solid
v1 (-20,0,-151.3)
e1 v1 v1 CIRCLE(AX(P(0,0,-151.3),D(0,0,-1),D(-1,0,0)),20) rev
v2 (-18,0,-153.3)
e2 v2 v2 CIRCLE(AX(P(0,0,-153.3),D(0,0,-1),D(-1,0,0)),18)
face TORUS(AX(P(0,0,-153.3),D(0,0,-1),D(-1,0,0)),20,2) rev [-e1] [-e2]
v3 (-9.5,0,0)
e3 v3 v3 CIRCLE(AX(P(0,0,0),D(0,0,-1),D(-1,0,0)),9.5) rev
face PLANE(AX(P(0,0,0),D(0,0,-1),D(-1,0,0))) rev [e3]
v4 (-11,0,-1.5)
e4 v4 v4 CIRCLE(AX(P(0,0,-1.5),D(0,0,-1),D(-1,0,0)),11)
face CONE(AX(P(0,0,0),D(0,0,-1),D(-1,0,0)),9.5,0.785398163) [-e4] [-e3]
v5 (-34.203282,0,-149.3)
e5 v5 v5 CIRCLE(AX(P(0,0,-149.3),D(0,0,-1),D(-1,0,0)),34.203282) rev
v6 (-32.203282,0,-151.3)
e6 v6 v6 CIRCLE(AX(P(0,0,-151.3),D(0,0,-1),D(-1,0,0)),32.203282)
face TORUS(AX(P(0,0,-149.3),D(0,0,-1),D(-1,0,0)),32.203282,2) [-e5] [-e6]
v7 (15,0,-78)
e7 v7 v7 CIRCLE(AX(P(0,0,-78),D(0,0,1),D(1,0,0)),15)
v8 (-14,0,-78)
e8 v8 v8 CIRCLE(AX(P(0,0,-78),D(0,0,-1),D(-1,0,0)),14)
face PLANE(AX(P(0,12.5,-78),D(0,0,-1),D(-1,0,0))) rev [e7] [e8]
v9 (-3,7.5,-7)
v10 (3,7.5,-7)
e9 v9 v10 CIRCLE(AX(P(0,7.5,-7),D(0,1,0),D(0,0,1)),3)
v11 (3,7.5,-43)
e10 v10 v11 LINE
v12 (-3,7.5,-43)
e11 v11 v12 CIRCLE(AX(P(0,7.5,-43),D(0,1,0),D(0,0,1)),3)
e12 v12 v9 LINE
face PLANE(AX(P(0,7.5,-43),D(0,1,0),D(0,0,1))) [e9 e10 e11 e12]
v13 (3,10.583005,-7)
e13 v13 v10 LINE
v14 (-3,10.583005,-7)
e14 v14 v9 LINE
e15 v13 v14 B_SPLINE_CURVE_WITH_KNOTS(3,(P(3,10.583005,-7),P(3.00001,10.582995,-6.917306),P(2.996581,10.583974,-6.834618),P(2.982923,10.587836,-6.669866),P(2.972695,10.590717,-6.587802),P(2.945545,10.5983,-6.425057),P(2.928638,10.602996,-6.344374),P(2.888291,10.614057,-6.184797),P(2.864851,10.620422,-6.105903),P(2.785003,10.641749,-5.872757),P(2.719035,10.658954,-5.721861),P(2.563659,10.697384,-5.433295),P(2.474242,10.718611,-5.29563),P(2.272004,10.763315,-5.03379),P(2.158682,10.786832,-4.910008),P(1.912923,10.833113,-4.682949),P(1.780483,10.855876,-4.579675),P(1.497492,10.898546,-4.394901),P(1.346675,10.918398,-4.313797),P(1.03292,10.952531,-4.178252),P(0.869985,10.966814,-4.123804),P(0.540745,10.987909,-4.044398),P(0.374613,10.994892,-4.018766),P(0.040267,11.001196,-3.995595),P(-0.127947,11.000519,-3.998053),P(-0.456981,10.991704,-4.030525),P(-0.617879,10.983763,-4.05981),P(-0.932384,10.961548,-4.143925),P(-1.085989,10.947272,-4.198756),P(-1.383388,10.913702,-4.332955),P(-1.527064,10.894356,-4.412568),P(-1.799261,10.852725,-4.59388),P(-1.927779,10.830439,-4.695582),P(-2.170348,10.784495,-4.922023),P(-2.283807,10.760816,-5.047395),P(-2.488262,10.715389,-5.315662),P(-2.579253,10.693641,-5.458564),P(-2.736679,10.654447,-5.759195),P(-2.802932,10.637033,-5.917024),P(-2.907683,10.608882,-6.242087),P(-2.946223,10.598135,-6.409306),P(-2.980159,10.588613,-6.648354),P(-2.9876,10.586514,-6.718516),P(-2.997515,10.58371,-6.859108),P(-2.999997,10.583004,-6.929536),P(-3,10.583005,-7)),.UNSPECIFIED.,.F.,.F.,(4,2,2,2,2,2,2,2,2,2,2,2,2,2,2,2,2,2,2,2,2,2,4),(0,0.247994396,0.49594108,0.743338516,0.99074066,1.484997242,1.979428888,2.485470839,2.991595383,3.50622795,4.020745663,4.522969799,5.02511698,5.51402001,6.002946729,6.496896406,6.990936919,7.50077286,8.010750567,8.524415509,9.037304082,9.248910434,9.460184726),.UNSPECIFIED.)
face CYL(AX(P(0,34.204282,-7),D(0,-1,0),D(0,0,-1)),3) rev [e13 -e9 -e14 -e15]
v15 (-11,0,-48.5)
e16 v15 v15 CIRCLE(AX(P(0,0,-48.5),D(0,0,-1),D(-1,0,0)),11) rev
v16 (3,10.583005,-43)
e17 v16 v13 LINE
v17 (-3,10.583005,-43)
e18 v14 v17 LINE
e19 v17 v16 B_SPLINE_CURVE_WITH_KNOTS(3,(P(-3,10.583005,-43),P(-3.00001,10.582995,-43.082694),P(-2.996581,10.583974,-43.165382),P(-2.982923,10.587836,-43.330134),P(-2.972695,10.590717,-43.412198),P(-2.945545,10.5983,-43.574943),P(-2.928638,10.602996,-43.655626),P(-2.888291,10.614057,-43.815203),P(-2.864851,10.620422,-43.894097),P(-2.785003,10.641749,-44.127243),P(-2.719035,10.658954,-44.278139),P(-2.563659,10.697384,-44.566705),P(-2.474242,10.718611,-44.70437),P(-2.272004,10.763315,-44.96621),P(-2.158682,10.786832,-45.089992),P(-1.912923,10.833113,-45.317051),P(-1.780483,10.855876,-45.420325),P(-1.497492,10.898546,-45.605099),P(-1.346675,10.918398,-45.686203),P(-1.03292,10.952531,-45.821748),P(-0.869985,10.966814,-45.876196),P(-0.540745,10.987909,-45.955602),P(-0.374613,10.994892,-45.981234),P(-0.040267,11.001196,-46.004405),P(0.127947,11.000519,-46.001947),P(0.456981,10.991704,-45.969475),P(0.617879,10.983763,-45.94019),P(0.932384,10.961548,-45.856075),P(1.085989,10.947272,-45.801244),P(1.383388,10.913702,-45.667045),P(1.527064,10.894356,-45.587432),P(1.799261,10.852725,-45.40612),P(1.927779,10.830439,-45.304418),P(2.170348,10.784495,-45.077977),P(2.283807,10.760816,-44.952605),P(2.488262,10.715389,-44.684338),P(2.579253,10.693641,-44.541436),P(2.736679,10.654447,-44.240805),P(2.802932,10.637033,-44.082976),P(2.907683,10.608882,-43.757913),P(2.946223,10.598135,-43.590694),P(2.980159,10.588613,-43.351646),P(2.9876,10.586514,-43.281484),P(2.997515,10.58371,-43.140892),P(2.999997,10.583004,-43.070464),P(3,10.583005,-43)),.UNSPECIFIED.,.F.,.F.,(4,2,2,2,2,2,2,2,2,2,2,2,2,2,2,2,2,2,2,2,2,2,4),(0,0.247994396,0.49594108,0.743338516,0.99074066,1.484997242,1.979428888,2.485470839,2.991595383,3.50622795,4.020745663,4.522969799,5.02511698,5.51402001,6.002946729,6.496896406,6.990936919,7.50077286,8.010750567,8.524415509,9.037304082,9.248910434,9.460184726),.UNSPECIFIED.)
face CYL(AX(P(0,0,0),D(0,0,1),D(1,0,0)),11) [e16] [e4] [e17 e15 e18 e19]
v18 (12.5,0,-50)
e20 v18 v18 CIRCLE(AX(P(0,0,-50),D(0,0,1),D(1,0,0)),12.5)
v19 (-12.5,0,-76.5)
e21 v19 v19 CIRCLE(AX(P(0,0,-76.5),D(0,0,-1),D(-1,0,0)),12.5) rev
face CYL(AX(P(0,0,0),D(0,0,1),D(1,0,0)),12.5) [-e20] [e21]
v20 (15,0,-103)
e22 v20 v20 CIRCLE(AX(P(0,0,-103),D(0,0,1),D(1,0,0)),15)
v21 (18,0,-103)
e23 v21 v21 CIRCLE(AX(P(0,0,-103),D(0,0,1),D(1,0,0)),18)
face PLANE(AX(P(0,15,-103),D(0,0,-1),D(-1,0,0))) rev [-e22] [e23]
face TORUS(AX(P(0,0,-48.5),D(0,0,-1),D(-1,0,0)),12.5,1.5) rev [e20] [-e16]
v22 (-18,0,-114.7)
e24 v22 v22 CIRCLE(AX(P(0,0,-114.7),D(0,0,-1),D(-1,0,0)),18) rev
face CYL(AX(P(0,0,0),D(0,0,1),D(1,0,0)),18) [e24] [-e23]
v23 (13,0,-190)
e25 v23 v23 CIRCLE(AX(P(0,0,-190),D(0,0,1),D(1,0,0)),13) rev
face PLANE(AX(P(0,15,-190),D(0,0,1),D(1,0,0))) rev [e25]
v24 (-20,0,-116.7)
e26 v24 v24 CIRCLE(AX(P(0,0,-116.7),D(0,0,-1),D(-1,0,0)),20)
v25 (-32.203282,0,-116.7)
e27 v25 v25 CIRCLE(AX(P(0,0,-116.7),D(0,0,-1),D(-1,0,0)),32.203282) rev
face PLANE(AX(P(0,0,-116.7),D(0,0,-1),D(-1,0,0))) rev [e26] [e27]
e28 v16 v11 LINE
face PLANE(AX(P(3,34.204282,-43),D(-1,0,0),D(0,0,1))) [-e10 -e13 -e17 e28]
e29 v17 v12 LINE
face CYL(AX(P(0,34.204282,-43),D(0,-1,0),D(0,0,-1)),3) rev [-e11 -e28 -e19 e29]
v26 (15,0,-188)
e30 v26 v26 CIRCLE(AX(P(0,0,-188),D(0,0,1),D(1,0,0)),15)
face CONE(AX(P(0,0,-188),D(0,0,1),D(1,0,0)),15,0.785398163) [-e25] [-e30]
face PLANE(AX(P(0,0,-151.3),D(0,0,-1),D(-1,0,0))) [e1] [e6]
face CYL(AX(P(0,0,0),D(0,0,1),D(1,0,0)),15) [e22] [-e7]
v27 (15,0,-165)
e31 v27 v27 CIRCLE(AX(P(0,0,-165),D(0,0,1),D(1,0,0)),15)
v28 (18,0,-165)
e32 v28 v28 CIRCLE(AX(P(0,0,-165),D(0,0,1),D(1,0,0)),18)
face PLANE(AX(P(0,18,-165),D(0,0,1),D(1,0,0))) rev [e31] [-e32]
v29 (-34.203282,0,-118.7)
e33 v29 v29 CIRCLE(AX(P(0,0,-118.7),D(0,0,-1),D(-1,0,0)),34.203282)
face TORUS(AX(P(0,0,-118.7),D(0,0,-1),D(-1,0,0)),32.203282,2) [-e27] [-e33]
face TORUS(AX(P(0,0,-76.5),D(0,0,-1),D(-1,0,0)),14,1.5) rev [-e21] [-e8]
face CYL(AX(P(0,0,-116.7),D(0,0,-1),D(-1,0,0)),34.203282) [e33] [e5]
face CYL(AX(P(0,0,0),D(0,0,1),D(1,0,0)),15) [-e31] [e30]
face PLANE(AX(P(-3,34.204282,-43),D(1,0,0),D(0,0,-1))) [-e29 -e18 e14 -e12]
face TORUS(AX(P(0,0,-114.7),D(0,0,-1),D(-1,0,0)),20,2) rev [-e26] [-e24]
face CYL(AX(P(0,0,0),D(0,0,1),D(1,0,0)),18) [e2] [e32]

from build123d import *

# Parameters (mm, degrees)
SKETCH3_R               = 34.2032822
BOSS_EXTRUDE1_DEPTH     = 34.6
FILLET1_R               = 1.5
FILLET2_R               = 2
CHAMFER2_SIZE           = 1.5
CHAMFER3_SIZE           = 2
SKETCH4_R               = 29.8214615
DF1_DEPTH               = 34.6
FILLET3_R               = 2
CUT_EXTRUDE1_REACH      = 199.507
CUT_EXTRUDE1_END_RADIUS = 11


with BuildPart() as part:
    # Sketch2 → Revolve1 (revolve)
    with BuildSketch(Plane(origin=(0, 0, 0), x_dir=(0, 0, -1), z_dir=(1, 0, 0)), mode=Mode.PRIVATE) as revolve1_sk:
        Polygon((0, 0), (0, 11), (50, 11), (50, 12.5), (78, 12.5), (78, 15), (103, 15), (103, 18), (165, 18), (165, 15), (190, 15), (190, 0), align=None)
    revolve(revolve1_sk.sketch.rotate(Axis((0, 0, 0), (0, 0, -1)), 90), axis=Axis((0, 0, 0), (0, 0, -1)))

    # Sketch3 → Boss-Extrude1 (add)
    with BuildSketch(Plane(origin=(0, 0, -151.3), x_dir=(-1, 0, 0), z_dir=(0, 0, -1))):
        Circle(SKETCH3_R)
    extrude(amount=-BOSS_EXTRUDE1_DEPTH)

    # Fillet1
    fillet1_edges = [part.edges().sort_by_distance(p)[0] for p in [
        (-12.5, 0, -78),
        (-11, 0, -50),
    ]]
    fillet(fillet1_edges, radius=FILLET1_R - 0.0001)  # a hair under: the kernel refuses the full size

    # Fillet2
    fillet2_edges = [part.edges().sort_by_distance(p)[0] for p in [
        (-18, 0, -116.7),
        (-18, 0, -151.3),
    ]]
    fillet(fillet2_edges, radius=FILLET2_R)

    # Chamfer2
    chamfer2_edges = [part.edges().sort_by_distance(p)[0] for p in [
        (-11, 0, 0),
    ]]
    chamfer(chamfer2_edges, length=CHAMFER2_SIZE)

    # Chamfer3
    chamfer3_edges = [part.edges().sort_by_distance(p)[0] for p in [
        (-15, 0, -190),
    ]]
    chamfer(chamfer3_edges, length=CHAMFER3_SIZE)

    # Sketch4 → df1 (add)
    with BuildSketch(Plane.XY.offset(-116.7)):
        Circle(SKETCH4_R)
    extrude(amount=-DF1_DEPTH)

    # Fillet3
    fillet3_edges = [part.edges().sort_by_distance(p)[0] for p in [
        (34.2032822, 0, -116.7),
        (34.2032822, 0, -151.3),
    ]]
    fillet(fillet3_edges, radius=FILLET3_R)

    # Cut-Extrude1: up to this cylinder (the profile starts inside it)
    cut_extrude1_end = Plane(origin=(0, 0, -25), z_dir=(0, 0, 1)) * Cylinder(CUT_EXTRUDE1_END_RADIUS, 422.014, mode=Mode.PRIVATE)
    # Sketch5 → Cut-Extrude1 (cut, up to the surface)
    with BuildSketch(Plane(origin=(0, 7.5, 0), x_dir=(1, 0, 0), z_dir=(0, 1, 0)), mode=Mode.PRIVATE) as cut_extrude1_sk1:
        with BuildLine():
            Line((3, 43), (3, 7))
            ThreePointArc((3, 7), (0, 4), (-3, 7))
            Line((-3, 7), (-3, 43))
            ThreePointArc((-3, 43), (0, 46), (3, 43))
        make_face()
    cut_extrude1_tool1 = extrude(cut_extrude1_sk1.sketch, amount=CUT_EXTRUDE1_REACH, mode=Mode.PRIVATE) & cut_extrude1_end
    add(cut_extrude1_tool1.solids().sort_by_distance((0, 7.5, -25))[0], mode=Mode.SUBTRACT)


solid = part.part
